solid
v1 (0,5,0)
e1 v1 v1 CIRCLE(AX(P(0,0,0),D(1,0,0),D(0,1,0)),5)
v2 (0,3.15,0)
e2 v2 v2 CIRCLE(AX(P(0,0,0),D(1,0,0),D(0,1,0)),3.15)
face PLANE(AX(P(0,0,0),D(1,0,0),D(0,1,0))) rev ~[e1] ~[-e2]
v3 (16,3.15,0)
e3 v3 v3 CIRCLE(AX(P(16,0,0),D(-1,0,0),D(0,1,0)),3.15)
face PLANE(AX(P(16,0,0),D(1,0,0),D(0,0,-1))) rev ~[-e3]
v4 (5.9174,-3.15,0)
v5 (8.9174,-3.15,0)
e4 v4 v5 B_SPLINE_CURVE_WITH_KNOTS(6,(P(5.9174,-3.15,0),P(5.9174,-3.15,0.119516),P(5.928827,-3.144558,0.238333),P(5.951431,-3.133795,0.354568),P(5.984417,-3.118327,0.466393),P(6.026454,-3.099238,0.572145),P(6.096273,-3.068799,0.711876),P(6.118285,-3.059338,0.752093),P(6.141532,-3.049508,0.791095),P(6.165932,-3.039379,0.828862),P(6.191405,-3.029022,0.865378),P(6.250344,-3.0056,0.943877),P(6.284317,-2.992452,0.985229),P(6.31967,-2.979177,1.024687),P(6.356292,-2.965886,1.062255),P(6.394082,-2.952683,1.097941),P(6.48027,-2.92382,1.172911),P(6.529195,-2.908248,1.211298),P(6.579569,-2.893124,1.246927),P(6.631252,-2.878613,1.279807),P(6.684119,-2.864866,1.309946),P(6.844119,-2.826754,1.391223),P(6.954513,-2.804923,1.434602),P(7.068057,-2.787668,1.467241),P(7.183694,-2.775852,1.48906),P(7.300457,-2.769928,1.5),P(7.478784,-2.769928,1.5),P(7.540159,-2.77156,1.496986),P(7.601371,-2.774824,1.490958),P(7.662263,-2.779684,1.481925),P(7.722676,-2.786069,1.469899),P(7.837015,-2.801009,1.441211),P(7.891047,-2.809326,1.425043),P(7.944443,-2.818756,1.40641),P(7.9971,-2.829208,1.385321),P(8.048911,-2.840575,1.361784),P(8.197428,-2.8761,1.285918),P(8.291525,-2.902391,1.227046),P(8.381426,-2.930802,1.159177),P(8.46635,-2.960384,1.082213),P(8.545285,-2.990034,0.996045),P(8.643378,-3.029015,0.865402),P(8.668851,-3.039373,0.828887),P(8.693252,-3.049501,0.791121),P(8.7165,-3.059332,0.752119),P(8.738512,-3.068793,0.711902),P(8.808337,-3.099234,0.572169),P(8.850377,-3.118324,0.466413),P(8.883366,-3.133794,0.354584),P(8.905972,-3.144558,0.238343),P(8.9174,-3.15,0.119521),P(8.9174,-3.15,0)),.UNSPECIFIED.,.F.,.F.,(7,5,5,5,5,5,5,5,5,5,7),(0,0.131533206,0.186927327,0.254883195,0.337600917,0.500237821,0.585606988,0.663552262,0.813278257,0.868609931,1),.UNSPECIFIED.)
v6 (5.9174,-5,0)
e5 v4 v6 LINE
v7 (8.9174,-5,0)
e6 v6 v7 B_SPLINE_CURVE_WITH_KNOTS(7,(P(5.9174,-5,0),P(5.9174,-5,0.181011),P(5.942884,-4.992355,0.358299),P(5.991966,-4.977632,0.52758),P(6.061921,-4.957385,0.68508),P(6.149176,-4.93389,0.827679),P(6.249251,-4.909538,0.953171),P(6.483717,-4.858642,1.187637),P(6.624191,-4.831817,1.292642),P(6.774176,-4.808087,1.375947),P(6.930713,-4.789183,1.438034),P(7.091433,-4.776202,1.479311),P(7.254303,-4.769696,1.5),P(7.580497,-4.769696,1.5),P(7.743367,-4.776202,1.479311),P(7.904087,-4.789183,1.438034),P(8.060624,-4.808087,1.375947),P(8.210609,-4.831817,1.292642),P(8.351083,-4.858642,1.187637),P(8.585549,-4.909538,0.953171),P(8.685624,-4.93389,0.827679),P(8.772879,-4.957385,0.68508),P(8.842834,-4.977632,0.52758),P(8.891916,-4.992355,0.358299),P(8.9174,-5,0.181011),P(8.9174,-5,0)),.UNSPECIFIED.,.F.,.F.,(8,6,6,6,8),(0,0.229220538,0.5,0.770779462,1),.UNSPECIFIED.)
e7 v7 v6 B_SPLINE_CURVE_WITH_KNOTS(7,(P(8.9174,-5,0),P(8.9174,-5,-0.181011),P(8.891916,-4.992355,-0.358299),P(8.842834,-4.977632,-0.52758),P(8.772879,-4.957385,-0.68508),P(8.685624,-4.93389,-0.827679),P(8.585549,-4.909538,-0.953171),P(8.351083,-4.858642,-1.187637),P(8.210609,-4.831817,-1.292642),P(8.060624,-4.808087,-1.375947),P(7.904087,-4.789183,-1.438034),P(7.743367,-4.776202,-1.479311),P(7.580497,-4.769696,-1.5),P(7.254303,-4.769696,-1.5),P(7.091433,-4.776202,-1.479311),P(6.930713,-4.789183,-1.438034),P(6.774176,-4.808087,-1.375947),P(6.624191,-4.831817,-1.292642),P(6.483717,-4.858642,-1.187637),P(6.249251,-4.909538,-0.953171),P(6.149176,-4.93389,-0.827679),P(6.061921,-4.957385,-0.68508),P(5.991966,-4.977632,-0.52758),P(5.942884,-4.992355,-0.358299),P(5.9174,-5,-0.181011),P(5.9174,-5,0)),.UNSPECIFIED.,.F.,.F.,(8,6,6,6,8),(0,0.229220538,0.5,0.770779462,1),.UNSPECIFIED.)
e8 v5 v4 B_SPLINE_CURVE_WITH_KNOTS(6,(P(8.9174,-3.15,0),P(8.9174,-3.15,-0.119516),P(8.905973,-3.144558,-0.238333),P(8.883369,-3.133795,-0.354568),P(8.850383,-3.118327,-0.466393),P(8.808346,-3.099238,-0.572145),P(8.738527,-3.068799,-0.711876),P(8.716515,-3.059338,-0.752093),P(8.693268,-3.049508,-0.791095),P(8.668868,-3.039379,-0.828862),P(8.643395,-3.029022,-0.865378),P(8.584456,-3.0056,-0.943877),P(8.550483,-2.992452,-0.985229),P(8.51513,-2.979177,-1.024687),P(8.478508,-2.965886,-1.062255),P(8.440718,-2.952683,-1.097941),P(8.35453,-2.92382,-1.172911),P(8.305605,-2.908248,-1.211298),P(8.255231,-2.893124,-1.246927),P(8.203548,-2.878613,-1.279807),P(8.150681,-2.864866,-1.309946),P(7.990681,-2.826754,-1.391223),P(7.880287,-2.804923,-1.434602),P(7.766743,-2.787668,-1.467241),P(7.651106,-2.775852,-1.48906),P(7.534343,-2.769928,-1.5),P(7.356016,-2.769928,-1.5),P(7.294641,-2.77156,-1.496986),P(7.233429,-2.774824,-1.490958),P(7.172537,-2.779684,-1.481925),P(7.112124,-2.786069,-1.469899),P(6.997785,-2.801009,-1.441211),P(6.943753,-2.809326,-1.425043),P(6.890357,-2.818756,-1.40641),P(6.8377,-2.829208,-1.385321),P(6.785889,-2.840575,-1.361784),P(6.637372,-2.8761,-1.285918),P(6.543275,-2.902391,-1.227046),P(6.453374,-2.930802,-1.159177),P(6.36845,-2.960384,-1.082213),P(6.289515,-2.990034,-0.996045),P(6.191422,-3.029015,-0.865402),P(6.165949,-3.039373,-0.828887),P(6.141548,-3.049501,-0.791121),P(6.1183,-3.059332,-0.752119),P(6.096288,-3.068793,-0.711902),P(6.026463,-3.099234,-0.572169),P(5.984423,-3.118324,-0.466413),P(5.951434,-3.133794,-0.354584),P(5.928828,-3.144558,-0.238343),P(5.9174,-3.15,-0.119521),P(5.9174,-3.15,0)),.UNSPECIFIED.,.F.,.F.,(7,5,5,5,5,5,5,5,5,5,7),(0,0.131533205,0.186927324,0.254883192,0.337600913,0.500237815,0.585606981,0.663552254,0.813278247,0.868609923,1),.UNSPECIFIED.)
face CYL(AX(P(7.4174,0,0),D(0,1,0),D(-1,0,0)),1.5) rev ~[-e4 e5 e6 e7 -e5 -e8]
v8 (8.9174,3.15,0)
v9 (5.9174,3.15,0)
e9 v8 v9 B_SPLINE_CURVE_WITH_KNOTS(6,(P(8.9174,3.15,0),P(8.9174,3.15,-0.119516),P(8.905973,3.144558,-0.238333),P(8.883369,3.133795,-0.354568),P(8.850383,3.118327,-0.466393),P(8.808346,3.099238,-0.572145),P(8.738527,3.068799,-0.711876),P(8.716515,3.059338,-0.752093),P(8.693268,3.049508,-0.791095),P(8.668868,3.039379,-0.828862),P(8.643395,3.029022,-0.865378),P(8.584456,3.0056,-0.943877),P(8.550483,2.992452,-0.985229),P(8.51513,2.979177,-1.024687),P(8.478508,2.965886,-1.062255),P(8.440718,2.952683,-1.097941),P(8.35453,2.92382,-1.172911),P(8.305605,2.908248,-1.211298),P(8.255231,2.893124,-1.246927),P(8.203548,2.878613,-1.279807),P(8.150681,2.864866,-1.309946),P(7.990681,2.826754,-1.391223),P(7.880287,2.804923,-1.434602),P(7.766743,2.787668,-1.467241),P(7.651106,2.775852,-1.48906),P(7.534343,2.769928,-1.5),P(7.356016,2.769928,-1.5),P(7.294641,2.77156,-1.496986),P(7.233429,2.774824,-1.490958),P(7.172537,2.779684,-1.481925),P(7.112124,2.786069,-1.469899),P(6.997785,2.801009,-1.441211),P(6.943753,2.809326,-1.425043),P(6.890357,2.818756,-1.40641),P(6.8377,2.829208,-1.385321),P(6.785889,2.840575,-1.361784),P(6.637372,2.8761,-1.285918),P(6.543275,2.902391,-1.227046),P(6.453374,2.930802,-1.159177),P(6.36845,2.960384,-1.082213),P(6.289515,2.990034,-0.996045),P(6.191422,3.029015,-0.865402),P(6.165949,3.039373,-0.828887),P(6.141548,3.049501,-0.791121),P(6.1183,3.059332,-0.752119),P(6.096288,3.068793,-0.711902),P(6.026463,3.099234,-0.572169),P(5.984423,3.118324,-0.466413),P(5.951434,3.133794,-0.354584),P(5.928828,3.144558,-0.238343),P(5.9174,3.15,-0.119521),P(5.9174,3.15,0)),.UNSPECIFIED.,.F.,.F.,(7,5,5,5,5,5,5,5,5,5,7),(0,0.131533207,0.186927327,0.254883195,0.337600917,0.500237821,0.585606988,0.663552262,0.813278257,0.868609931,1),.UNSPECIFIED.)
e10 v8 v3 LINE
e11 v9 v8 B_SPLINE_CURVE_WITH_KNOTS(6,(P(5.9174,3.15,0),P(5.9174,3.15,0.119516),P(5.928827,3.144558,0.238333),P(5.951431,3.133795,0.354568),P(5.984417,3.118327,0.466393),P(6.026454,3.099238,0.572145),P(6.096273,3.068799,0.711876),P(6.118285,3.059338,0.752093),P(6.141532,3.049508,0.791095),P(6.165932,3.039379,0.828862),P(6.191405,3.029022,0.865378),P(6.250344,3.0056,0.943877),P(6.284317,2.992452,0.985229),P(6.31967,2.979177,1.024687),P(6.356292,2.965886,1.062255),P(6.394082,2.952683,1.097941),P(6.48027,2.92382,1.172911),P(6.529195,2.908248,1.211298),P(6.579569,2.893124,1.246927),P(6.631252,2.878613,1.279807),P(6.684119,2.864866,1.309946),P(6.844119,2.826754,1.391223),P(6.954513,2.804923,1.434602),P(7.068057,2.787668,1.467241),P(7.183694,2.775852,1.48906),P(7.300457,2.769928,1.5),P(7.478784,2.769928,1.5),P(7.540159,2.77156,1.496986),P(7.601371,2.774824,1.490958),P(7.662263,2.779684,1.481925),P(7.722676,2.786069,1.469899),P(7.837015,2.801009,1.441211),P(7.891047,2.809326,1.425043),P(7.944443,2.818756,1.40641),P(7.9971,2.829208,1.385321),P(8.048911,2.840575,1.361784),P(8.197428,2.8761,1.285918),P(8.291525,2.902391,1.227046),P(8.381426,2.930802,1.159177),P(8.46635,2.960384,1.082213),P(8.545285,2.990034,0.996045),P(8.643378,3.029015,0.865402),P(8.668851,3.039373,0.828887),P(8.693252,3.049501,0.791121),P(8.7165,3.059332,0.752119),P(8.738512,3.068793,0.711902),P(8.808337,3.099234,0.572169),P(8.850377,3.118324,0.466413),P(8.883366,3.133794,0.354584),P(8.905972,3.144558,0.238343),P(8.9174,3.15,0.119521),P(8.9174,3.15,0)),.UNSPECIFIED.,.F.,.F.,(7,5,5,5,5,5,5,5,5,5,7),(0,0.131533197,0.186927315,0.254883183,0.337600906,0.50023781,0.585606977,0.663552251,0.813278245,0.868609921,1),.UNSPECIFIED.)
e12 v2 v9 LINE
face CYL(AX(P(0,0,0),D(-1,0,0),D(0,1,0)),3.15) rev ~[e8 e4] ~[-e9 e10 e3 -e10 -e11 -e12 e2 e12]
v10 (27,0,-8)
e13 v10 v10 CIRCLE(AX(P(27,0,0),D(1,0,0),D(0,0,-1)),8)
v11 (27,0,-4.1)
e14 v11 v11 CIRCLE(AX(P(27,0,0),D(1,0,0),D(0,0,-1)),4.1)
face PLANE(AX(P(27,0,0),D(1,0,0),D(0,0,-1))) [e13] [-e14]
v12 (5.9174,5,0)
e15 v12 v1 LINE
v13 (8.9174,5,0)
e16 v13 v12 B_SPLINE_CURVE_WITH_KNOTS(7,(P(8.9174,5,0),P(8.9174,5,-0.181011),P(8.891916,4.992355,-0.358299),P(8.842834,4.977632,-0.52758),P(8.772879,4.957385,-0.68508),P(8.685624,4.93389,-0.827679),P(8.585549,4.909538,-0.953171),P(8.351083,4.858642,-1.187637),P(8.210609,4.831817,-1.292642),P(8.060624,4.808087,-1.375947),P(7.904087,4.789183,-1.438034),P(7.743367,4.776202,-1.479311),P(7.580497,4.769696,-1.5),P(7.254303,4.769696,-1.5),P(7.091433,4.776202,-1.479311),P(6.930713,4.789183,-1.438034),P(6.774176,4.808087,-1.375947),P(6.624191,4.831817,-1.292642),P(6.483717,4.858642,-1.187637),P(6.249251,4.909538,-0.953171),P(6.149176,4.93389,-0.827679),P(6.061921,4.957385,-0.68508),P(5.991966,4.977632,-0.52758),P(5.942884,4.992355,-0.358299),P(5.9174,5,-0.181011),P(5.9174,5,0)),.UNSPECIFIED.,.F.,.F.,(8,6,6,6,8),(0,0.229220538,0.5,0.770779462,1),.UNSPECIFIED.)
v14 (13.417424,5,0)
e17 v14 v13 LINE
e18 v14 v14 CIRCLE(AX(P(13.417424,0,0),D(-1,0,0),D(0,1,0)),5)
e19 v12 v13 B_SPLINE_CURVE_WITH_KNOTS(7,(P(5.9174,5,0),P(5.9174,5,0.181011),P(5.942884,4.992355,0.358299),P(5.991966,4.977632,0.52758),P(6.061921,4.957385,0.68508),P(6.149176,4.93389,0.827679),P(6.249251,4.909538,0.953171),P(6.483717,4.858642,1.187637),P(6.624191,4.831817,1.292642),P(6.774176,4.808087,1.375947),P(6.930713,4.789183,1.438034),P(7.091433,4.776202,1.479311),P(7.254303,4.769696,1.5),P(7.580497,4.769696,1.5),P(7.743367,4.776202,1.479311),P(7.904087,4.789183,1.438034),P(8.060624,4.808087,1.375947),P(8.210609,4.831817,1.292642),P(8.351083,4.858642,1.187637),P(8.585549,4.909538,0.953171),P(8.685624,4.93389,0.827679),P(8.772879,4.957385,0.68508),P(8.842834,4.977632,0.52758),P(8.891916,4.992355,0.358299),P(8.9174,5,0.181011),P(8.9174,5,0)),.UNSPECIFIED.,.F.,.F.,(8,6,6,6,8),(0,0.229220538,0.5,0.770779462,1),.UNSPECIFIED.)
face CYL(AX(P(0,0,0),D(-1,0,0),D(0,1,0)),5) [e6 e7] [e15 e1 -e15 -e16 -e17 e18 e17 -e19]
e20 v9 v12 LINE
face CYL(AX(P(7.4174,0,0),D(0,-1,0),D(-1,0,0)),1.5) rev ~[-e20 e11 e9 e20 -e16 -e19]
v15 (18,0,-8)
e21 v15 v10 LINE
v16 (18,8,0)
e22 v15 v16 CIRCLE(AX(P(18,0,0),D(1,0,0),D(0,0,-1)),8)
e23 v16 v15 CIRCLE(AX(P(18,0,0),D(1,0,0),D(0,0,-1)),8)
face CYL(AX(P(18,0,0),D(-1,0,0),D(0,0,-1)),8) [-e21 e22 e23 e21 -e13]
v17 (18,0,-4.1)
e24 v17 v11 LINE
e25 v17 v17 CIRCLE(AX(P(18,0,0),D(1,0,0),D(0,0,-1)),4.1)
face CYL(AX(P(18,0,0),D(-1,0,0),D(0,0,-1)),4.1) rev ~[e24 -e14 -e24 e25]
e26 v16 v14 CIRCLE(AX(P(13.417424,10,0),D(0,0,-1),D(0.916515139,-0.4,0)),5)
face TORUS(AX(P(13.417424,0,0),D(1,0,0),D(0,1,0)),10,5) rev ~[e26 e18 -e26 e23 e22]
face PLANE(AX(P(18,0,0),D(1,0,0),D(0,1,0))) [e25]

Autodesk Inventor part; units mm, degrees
ref_plane "YZ Plane" through (0, 0, 0) normal (1, 0, 0) x (0, 1, 0)
ref_plane "XZ Plane" through (0, 0, 0) normal (0, 1, 0) x (-1, 0, 0)
ref_plane "XY Plane" through (0, 0, 0) normal (0, 0, 1) x (1, 0, 0)
sketch "Sketch1" plane through (0, 0, 0) normal (1, 0, 0) x (0, 1, 0)
  circle A0 centre (0, 0) radius 3.15
  circle A1 centre (0, 0) radius 5
  dimension "d0" = 6.3
  dimension "d1" = 10
extrude "Extrusion1" add sketch "Sketch1" along normal blind 18
sketch "Sketch2" plane through (18, 0, 0) normal (1, 0, 0) x (0, 0, -1)
  circle A0 centre (0, 0) radius 5
  dimension "d4" = 10
extrude "Extrusion2" add sketch "Sketch2" against normal blind 2
sketch "Sketch3" plane through (18, 0, 0) normal (1, 0, 0) x (0, 0, -1)
  circle A0 centre (0, 0) radius 4.1
  circle A1 centre (0, 0) radius 8
  dimension "d7" = 8.2
  dimension "d8" = 16
extrude "Extrusion3" add sketch "Sketch3" along normal blind 9
fillet "Fillet1" radius 5 1 edges at (18, -5, 0)
sketch "Sketch4" plane through (0, 0, 0) normal (0, 1, 0) x (-1, 0, 0)
  line L0 (-13.4174, 5) -> (-13.4174, -5) projected
  line L1 (-13.4174, 0) -> (-7.4174, 0)
  circle A0 centre (-7.4174, 0) radius 1.5
  point P0 (0, 0)
  dimension "d12" = 6
  dimension "d13" = 3
extrude "Extrusion4" cut sketch "Sketch4" along normal mid plane 44
properties part number "coupling_motor_lead_screw"
